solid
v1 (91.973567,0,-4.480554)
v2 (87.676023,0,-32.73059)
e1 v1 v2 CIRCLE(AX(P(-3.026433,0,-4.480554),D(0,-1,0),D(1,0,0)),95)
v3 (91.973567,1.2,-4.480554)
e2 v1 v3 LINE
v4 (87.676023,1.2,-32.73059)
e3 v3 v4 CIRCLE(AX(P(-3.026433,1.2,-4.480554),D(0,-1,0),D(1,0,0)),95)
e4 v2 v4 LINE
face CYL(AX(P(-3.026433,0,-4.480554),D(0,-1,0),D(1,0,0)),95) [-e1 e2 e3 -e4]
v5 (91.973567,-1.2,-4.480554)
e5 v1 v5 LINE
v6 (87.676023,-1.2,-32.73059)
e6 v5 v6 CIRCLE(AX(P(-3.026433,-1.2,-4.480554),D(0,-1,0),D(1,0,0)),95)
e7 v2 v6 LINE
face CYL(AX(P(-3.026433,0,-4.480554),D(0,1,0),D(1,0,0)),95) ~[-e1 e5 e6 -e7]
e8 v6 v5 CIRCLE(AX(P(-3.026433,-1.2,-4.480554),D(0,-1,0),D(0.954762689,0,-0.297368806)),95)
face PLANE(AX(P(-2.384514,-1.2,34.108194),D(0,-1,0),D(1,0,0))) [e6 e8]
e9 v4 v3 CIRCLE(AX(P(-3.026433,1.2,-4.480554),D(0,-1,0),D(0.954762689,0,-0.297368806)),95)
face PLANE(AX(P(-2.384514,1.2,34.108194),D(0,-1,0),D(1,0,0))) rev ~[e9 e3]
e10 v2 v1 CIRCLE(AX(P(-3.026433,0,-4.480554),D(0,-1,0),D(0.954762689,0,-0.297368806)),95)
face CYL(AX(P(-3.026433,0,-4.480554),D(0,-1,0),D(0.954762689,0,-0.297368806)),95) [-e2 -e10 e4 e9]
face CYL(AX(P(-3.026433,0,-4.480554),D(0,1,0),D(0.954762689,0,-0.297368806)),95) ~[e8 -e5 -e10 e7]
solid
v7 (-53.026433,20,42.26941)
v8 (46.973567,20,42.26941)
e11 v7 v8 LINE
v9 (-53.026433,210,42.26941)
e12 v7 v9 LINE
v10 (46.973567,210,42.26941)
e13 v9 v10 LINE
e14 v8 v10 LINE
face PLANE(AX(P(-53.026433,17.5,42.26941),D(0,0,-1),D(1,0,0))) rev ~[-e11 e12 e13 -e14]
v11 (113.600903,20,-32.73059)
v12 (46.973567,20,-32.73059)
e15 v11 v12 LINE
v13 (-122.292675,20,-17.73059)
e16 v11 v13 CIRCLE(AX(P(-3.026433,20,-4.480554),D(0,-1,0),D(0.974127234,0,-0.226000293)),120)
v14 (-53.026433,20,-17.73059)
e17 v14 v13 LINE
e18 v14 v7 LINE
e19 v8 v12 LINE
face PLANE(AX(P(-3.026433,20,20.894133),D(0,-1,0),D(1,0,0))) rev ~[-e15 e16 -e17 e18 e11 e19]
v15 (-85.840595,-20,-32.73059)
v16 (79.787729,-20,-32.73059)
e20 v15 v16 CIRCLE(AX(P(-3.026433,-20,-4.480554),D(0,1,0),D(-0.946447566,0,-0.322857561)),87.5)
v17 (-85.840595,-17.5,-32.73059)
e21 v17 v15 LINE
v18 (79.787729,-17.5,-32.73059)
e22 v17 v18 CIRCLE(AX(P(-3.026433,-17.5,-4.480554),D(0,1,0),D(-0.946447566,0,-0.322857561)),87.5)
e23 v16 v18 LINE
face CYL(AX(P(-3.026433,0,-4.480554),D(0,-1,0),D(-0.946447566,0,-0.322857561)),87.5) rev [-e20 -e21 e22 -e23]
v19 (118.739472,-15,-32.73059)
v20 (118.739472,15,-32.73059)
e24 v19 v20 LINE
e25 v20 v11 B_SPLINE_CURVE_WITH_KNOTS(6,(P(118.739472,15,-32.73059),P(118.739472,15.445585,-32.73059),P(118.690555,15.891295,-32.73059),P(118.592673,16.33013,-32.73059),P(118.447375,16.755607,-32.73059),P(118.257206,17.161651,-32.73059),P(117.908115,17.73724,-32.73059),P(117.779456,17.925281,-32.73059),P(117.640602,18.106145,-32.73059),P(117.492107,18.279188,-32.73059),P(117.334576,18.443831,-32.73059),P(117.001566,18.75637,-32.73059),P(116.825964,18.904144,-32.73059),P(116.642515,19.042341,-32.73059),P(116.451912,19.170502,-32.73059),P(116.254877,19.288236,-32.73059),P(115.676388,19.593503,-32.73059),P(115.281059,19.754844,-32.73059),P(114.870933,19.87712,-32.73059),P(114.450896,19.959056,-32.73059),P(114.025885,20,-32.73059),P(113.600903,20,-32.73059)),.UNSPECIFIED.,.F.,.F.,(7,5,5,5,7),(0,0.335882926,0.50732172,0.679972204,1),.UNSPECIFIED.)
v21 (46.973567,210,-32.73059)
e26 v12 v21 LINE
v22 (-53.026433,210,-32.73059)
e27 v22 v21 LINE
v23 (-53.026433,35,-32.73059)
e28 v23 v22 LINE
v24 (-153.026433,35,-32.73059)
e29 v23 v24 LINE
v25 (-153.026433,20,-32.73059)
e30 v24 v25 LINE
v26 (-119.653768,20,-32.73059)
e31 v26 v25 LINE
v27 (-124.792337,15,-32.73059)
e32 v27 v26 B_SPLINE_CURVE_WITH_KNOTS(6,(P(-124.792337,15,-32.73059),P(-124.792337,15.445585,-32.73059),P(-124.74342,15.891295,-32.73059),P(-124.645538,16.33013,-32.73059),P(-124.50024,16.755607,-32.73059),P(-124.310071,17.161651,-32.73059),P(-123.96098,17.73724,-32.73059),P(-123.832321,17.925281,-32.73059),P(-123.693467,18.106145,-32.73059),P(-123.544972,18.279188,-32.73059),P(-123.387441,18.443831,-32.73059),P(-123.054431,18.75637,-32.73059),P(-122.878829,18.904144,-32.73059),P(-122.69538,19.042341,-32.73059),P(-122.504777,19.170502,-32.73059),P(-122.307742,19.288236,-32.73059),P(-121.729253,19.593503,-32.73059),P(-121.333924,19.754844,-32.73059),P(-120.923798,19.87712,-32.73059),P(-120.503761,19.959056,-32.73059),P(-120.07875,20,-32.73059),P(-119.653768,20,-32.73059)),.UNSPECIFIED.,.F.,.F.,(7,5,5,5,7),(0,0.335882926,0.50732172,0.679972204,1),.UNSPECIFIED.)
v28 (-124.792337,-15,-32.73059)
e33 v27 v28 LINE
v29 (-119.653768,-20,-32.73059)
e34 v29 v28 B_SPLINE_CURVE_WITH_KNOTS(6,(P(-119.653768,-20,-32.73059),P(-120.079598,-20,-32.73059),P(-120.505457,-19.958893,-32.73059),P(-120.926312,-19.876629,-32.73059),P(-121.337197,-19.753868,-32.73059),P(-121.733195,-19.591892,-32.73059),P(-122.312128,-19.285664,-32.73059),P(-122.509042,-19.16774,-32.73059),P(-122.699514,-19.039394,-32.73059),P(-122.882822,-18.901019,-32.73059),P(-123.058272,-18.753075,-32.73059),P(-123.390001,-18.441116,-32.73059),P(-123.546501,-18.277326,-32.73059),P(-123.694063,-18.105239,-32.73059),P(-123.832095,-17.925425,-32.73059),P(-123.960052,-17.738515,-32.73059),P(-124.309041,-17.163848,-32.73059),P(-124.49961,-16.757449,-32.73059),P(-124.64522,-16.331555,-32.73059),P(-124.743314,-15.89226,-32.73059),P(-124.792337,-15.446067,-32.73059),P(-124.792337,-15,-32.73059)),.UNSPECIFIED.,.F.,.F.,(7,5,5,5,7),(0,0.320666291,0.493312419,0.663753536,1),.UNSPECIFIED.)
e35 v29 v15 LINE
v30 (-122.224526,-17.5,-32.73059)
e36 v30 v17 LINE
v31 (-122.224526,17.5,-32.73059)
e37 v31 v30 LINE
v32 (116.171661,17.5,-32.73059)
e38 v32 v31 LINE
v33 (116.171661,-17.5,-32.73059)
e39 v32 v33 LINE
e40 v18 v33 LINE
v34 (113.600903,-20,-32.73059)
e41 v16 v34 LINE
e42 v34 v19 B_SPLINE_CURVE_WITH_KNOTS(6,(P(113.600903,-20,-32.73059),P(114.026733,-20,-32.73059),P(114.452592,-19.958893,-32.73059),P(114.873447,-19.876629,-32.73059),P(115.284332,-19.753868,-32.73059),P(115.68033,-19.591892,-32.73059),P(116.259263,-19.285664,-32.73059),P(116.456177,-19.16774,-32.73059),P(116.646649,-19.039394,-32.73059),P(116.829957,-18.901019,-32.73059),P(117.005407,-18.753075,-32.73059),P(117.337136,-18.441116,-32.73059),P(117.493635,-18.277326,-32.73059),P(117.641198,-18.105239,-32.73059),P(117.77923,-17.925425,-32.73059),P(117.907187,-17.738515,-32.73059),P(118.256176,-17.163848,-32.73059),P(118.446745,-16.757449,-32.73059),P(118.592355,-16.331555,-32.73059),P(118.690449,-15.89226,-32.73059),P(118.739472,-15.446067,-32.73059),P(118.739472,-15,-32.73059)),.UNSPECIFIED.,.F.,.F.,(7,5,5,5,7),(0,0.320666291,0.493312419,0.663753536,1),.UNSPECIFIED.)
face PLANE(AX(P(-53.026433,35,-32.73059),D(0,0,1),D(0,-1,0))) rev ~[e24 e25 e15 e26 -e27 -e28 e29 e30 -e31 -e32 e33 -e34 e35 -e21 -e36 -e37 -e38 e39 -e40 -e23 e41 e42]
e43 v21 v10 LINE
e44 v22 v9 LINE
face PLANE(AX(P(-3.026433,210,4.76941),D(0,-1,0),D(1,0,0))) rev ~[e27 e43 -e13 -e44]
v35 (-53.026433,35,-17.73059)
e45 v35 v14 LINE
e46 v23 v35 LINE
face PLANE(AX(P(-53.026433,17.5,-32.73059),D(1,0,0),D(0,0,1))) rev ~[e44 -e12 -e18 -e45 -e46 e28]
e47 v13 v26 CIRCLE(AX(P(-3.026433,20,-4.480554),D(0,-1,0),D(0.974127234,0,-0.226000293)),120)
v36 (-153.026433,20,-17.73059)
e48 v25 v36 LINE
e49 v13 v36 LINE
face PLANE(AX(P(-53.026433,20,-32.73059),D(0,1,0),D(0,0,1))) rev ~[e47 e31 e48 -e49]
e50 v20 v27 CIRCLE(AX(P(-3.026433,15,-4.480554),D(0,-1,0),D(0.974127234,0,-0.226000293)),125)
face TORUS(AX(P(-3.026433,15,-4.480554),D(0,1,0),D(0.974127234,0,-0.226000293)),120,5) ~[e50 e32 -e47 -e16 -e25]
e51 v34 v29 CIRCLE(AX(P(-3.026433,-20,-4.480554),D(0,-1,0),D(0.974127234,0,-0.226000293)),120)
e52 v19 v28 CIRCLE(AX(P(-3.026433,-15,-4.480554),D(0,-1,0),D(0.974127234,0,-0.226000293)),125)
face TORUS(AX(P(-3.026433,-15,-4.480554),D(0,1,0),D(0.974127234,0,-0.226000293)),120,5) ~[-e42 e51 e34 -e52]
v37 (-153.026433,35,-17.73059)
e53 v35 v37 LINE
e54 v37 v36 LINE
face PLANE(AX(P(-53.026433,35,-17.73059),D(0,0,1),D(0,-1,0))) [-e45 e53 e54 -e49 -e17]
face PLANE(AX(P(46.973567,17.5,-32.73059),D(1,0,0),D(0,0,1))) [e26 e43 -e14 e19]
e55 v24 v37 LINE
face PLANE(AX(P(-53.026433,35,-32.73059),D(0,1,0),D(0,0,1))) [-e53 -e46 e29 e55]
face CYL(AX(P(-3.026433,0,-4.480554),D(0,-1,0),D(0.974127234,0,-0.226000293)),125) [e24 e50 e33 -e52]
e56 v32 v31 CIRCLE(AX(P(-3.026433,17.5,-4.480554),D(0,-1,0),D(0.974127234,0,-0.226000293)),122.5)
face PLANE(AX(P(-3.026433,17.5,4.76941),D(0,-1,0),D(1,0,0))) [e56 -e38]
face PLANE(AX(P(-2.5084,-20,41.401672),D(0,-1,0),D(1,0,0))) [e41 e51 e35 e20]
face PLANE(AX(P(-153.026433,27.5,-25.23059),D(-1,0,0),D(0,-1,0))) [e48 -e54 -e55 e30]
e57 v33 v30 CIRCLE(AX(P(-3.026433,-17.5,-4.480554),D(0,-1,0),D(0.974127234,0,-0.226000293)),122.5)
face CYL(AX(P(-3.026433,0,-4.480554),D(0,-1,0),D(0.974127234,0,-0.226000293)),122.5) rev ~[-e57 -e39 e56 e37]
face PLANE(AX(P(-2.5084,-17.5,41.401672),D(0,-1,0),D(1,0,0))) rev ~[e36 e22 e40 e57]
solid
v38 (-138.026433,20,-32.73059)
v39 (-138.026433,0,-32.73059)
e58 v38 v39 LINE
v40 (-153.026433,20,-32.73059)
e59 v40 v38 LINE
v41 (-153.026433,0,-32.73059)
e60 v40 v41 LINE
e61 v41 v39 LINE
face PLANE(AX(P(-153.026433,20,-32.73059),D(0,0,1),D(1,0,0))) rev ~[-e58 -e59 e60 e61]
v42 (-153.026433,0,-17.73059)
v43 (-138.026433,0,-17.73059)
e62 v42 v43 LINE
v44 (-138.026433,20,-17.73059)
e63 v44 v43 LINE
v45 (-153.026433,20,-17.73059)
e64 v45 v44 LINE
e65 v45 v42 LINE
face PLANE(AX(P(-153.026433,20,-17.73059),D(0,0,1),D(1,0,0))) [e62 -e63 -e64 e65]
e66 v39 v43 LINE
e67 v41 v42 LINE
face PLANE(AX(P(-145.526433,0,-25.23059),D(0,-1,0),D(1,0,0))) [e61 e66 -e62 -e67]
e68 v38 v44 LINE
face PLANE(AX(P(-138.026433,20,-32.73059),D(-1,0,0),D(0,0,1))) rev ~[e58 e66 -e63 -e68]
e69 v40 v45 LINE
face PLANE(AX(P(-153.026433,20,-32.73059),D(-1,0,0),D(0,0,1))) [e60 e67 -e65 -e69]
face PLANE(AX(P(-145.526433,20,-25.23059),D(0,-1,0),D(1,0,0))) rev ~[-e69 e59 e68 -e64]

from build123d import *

# Parameters (mm, degrees)
F1_DEPTH  = 20
F2_T      = -2.5
F3_START  = -17.5
F3_DEPTH  = 2.5
F4_START  = -17.5
F0_W      = 100
F0_H      = 75
F4_DEPTH  = 192.5
F5_R      = 5
F6_DEPTH  = 1.2
F7_W      = 15
F7_H      = 15
F8_DEPTH  = 100
F9_W      = 15
F9_H      = 15
F10_DEPTH = 20


with BuildPart() as f1:
    # F0 (on Front) → F1 (new body, symmetric)
    with BuildSketch(Plane.XZ):
        with BuildLine():
            ThreePointArc((-93.7288880384, -32.7305903801), (-17.3139573127, 89.4389150959), (91.973567456, -4.4805537909))
            ThreePointArc((91.973567456, -4.4805537909), (90.8930363428, -18.7680785596), (87.6760229504, -32.7305903801))
            Line((87.6760229504, -32.7305903801), (118.739471685, -32.7305903801))
            ThreePointArc((118.739471685, -32.7305903801), (-3.026432544, 120.5194462091), (-124.792336773, -32.7305903801))
            Line((-124.792336773, -32.7305903801), (-93.7288880384, -32.7305903801))
        make_face()
        with BuildLine():
            ThreePointArc((87.6760229504, -32.7305903801), (90.8930363428, -18.7680785596), (91.973567456, -4.4805537909))
            ThreePointArc((91.973567456, -4.4805537909), (-17.3139573127, 89.4389150959), (-93.7288880384, -32.7305903801))
            Line((-93.7288880384, -32.7305903801), (-85.8405945739, -32.7305903801))
            ThreePointArc((-85.8405945739, -32.7305903801), (-3.026432544, 83.0194462091), (79.7877294859, -32.7305903801))
            Line((79.7877294859, -32.7305903801), (87.6760229504, -32.7305903801))
        make_face()
    extrude(amount=F1_DEPTH, both=True)

    # F2
    f2_openings = [f1.faces().sort_by_distance(p)[0] for p in [
        (-3.026433, 0, 83.019446),
        (99.263601, 0, -32.73059),
        (-105.316466, 0, -32.73059),
    ]]
    offset(amount=F2_T, openings=f2_openings)

    # F0 (on Front) → F3 (join)
    with BuildSketch(Plane.XZ.offset(F3_START)):
        with BuildLine():
            ThreePointArc((79.7877294859, -32.7305903801), (-3.026432544, 83.0194462091), (-85.8405945739, -32.7305903801))
            Line((-85.8405945739, -32.7305903801), (-53.026432544, -32.7305903801))
            Line((-53.026432544, -32.7305903801), (-53.026432544, 42.2694096199))
            Line((-53.026432544, 42.2694096199), (46.973567456, 42.2694096199))
            Line((46.973567456, 42.2694096199), (46.973567456, -32.7305903801))
            Line((46.973567456, -32.7305903801), (79.7877294859, -32.7305903801))
        make_face()
    extrude(amount=-F3_DEPTH)

    # F0 (on Front) → F4 (join)
    with BuildSketch(Plane.XZ.offset(F4_START)):
        with Locations((-3.026432544, 4.7694096199)):
            Rectangle(F0_W, F0_H)
    extrude(amount=-F4_DEPTH)

    # F5
    f5_edges = [f1.edges().sort_by_distance(p)[0] for p in [
        (-3.026433, -20, 120.519446),
        (-3.026433, 20, 120.519446),
    ]]
    fillet(f5_edges, radius=F5_R)

    # F7 (on face) → F8 (join)
    with BuildSketch(Plane(origin=(-53.026432544, 0, 0), x_dir=(0, -1, 0), z_dir=(-1, 0, 0))):
        with Locations((-27.5, -25.2305903801)):
            Rectangle(F7_W, F7_H)
    extrude(amount=F8_DEPTH)


with BuildPart() as f6:
    # F0 (on Front) → F6 (new body, symmetric)
    with BuildSketch(Plane.XZ):
        with BuildLine():
            ThreePointArc((87.6760229504, -32.7305903801), (90.8930363428, -18.7680785596), (91.973567456, -4.4805537909))
            ThreePointArc((91.973567456, -4.4805537909), (-17.3139573127, 89.4389150959), (-93.7288880384, -32.7305903801))
            Line((-93.7288880384, -32.7305903801), (-85.8405945739, -32.7305903801))
            ThreePointArc((-85.8405945739, -32.7305903801), (-3.026432544, 83.0194462091), (79.7877294859, -32.7305903801))
            Line((79.7877294859, -32.7305903801), (87.6760229504, -32.7305903801))
        make_face()
        with BuildLine():
            ThreePointArc((79.7877294859, -32.7305903801), (-3.026432544, 83.0194462091), (-85.8405945739, -32.7305903801))
            Line((-85.8405945739, -32.7305903801), (-53.026432544, -32.7305903801))
            Line((-53.026432544, -32.7305903801), (-53.026432544, 42.2694096199))
            Line((-53.026432544, 42.2694096199), (46.973567456, 42.2694096199))
            Line((46.973567456, 42.2694096199), (46.973567456, -32.7305903801))
            Line((46.973567456, -32.7305903801), (79.7877294859, -32.7305903801))
        make_face()
        with Locations((-3.026432544, 4.7694096199)):
            Rectangle(F0_W, F0_H)
        with BuildLine():
            Line((-85.8405945739, -32.7305903801), (-93.7288880384, -32.7305903801))
            ThreePointArc((-93.7288880384, -32.7305903801), (-3.026432544, -99.4805537909), (87.6760229504, -32.7305903801))
            Line((87.6760229504, -32.7305903801), (79.7877294859, -32.7305903801))
            Line((79.7877294859, -32.7305903801), (46.973567456, -32.7305903801))
            Line((46.973567456, -32.7305903801), (-53.026432544, -32.7305903801))
            Line((-53.026432544, -32.7305903801), (-85.8405945739, -32.7305903801))
        make_face()
    extrude(amount=F6_DEPTH, both=True)


with BuildPart() as f10:
    # F9 (on face) → F10 (new body)
    with BuildSketch(Plane.XZ.offset(-20)):
        with Locations((-145.526432544, -25.2305903801)):
            Rectangle(F9_W, F9_H)
    extrude(amount=F10_DEPTH)


solid = Compound([f1.part, f6.part, f10.part])
